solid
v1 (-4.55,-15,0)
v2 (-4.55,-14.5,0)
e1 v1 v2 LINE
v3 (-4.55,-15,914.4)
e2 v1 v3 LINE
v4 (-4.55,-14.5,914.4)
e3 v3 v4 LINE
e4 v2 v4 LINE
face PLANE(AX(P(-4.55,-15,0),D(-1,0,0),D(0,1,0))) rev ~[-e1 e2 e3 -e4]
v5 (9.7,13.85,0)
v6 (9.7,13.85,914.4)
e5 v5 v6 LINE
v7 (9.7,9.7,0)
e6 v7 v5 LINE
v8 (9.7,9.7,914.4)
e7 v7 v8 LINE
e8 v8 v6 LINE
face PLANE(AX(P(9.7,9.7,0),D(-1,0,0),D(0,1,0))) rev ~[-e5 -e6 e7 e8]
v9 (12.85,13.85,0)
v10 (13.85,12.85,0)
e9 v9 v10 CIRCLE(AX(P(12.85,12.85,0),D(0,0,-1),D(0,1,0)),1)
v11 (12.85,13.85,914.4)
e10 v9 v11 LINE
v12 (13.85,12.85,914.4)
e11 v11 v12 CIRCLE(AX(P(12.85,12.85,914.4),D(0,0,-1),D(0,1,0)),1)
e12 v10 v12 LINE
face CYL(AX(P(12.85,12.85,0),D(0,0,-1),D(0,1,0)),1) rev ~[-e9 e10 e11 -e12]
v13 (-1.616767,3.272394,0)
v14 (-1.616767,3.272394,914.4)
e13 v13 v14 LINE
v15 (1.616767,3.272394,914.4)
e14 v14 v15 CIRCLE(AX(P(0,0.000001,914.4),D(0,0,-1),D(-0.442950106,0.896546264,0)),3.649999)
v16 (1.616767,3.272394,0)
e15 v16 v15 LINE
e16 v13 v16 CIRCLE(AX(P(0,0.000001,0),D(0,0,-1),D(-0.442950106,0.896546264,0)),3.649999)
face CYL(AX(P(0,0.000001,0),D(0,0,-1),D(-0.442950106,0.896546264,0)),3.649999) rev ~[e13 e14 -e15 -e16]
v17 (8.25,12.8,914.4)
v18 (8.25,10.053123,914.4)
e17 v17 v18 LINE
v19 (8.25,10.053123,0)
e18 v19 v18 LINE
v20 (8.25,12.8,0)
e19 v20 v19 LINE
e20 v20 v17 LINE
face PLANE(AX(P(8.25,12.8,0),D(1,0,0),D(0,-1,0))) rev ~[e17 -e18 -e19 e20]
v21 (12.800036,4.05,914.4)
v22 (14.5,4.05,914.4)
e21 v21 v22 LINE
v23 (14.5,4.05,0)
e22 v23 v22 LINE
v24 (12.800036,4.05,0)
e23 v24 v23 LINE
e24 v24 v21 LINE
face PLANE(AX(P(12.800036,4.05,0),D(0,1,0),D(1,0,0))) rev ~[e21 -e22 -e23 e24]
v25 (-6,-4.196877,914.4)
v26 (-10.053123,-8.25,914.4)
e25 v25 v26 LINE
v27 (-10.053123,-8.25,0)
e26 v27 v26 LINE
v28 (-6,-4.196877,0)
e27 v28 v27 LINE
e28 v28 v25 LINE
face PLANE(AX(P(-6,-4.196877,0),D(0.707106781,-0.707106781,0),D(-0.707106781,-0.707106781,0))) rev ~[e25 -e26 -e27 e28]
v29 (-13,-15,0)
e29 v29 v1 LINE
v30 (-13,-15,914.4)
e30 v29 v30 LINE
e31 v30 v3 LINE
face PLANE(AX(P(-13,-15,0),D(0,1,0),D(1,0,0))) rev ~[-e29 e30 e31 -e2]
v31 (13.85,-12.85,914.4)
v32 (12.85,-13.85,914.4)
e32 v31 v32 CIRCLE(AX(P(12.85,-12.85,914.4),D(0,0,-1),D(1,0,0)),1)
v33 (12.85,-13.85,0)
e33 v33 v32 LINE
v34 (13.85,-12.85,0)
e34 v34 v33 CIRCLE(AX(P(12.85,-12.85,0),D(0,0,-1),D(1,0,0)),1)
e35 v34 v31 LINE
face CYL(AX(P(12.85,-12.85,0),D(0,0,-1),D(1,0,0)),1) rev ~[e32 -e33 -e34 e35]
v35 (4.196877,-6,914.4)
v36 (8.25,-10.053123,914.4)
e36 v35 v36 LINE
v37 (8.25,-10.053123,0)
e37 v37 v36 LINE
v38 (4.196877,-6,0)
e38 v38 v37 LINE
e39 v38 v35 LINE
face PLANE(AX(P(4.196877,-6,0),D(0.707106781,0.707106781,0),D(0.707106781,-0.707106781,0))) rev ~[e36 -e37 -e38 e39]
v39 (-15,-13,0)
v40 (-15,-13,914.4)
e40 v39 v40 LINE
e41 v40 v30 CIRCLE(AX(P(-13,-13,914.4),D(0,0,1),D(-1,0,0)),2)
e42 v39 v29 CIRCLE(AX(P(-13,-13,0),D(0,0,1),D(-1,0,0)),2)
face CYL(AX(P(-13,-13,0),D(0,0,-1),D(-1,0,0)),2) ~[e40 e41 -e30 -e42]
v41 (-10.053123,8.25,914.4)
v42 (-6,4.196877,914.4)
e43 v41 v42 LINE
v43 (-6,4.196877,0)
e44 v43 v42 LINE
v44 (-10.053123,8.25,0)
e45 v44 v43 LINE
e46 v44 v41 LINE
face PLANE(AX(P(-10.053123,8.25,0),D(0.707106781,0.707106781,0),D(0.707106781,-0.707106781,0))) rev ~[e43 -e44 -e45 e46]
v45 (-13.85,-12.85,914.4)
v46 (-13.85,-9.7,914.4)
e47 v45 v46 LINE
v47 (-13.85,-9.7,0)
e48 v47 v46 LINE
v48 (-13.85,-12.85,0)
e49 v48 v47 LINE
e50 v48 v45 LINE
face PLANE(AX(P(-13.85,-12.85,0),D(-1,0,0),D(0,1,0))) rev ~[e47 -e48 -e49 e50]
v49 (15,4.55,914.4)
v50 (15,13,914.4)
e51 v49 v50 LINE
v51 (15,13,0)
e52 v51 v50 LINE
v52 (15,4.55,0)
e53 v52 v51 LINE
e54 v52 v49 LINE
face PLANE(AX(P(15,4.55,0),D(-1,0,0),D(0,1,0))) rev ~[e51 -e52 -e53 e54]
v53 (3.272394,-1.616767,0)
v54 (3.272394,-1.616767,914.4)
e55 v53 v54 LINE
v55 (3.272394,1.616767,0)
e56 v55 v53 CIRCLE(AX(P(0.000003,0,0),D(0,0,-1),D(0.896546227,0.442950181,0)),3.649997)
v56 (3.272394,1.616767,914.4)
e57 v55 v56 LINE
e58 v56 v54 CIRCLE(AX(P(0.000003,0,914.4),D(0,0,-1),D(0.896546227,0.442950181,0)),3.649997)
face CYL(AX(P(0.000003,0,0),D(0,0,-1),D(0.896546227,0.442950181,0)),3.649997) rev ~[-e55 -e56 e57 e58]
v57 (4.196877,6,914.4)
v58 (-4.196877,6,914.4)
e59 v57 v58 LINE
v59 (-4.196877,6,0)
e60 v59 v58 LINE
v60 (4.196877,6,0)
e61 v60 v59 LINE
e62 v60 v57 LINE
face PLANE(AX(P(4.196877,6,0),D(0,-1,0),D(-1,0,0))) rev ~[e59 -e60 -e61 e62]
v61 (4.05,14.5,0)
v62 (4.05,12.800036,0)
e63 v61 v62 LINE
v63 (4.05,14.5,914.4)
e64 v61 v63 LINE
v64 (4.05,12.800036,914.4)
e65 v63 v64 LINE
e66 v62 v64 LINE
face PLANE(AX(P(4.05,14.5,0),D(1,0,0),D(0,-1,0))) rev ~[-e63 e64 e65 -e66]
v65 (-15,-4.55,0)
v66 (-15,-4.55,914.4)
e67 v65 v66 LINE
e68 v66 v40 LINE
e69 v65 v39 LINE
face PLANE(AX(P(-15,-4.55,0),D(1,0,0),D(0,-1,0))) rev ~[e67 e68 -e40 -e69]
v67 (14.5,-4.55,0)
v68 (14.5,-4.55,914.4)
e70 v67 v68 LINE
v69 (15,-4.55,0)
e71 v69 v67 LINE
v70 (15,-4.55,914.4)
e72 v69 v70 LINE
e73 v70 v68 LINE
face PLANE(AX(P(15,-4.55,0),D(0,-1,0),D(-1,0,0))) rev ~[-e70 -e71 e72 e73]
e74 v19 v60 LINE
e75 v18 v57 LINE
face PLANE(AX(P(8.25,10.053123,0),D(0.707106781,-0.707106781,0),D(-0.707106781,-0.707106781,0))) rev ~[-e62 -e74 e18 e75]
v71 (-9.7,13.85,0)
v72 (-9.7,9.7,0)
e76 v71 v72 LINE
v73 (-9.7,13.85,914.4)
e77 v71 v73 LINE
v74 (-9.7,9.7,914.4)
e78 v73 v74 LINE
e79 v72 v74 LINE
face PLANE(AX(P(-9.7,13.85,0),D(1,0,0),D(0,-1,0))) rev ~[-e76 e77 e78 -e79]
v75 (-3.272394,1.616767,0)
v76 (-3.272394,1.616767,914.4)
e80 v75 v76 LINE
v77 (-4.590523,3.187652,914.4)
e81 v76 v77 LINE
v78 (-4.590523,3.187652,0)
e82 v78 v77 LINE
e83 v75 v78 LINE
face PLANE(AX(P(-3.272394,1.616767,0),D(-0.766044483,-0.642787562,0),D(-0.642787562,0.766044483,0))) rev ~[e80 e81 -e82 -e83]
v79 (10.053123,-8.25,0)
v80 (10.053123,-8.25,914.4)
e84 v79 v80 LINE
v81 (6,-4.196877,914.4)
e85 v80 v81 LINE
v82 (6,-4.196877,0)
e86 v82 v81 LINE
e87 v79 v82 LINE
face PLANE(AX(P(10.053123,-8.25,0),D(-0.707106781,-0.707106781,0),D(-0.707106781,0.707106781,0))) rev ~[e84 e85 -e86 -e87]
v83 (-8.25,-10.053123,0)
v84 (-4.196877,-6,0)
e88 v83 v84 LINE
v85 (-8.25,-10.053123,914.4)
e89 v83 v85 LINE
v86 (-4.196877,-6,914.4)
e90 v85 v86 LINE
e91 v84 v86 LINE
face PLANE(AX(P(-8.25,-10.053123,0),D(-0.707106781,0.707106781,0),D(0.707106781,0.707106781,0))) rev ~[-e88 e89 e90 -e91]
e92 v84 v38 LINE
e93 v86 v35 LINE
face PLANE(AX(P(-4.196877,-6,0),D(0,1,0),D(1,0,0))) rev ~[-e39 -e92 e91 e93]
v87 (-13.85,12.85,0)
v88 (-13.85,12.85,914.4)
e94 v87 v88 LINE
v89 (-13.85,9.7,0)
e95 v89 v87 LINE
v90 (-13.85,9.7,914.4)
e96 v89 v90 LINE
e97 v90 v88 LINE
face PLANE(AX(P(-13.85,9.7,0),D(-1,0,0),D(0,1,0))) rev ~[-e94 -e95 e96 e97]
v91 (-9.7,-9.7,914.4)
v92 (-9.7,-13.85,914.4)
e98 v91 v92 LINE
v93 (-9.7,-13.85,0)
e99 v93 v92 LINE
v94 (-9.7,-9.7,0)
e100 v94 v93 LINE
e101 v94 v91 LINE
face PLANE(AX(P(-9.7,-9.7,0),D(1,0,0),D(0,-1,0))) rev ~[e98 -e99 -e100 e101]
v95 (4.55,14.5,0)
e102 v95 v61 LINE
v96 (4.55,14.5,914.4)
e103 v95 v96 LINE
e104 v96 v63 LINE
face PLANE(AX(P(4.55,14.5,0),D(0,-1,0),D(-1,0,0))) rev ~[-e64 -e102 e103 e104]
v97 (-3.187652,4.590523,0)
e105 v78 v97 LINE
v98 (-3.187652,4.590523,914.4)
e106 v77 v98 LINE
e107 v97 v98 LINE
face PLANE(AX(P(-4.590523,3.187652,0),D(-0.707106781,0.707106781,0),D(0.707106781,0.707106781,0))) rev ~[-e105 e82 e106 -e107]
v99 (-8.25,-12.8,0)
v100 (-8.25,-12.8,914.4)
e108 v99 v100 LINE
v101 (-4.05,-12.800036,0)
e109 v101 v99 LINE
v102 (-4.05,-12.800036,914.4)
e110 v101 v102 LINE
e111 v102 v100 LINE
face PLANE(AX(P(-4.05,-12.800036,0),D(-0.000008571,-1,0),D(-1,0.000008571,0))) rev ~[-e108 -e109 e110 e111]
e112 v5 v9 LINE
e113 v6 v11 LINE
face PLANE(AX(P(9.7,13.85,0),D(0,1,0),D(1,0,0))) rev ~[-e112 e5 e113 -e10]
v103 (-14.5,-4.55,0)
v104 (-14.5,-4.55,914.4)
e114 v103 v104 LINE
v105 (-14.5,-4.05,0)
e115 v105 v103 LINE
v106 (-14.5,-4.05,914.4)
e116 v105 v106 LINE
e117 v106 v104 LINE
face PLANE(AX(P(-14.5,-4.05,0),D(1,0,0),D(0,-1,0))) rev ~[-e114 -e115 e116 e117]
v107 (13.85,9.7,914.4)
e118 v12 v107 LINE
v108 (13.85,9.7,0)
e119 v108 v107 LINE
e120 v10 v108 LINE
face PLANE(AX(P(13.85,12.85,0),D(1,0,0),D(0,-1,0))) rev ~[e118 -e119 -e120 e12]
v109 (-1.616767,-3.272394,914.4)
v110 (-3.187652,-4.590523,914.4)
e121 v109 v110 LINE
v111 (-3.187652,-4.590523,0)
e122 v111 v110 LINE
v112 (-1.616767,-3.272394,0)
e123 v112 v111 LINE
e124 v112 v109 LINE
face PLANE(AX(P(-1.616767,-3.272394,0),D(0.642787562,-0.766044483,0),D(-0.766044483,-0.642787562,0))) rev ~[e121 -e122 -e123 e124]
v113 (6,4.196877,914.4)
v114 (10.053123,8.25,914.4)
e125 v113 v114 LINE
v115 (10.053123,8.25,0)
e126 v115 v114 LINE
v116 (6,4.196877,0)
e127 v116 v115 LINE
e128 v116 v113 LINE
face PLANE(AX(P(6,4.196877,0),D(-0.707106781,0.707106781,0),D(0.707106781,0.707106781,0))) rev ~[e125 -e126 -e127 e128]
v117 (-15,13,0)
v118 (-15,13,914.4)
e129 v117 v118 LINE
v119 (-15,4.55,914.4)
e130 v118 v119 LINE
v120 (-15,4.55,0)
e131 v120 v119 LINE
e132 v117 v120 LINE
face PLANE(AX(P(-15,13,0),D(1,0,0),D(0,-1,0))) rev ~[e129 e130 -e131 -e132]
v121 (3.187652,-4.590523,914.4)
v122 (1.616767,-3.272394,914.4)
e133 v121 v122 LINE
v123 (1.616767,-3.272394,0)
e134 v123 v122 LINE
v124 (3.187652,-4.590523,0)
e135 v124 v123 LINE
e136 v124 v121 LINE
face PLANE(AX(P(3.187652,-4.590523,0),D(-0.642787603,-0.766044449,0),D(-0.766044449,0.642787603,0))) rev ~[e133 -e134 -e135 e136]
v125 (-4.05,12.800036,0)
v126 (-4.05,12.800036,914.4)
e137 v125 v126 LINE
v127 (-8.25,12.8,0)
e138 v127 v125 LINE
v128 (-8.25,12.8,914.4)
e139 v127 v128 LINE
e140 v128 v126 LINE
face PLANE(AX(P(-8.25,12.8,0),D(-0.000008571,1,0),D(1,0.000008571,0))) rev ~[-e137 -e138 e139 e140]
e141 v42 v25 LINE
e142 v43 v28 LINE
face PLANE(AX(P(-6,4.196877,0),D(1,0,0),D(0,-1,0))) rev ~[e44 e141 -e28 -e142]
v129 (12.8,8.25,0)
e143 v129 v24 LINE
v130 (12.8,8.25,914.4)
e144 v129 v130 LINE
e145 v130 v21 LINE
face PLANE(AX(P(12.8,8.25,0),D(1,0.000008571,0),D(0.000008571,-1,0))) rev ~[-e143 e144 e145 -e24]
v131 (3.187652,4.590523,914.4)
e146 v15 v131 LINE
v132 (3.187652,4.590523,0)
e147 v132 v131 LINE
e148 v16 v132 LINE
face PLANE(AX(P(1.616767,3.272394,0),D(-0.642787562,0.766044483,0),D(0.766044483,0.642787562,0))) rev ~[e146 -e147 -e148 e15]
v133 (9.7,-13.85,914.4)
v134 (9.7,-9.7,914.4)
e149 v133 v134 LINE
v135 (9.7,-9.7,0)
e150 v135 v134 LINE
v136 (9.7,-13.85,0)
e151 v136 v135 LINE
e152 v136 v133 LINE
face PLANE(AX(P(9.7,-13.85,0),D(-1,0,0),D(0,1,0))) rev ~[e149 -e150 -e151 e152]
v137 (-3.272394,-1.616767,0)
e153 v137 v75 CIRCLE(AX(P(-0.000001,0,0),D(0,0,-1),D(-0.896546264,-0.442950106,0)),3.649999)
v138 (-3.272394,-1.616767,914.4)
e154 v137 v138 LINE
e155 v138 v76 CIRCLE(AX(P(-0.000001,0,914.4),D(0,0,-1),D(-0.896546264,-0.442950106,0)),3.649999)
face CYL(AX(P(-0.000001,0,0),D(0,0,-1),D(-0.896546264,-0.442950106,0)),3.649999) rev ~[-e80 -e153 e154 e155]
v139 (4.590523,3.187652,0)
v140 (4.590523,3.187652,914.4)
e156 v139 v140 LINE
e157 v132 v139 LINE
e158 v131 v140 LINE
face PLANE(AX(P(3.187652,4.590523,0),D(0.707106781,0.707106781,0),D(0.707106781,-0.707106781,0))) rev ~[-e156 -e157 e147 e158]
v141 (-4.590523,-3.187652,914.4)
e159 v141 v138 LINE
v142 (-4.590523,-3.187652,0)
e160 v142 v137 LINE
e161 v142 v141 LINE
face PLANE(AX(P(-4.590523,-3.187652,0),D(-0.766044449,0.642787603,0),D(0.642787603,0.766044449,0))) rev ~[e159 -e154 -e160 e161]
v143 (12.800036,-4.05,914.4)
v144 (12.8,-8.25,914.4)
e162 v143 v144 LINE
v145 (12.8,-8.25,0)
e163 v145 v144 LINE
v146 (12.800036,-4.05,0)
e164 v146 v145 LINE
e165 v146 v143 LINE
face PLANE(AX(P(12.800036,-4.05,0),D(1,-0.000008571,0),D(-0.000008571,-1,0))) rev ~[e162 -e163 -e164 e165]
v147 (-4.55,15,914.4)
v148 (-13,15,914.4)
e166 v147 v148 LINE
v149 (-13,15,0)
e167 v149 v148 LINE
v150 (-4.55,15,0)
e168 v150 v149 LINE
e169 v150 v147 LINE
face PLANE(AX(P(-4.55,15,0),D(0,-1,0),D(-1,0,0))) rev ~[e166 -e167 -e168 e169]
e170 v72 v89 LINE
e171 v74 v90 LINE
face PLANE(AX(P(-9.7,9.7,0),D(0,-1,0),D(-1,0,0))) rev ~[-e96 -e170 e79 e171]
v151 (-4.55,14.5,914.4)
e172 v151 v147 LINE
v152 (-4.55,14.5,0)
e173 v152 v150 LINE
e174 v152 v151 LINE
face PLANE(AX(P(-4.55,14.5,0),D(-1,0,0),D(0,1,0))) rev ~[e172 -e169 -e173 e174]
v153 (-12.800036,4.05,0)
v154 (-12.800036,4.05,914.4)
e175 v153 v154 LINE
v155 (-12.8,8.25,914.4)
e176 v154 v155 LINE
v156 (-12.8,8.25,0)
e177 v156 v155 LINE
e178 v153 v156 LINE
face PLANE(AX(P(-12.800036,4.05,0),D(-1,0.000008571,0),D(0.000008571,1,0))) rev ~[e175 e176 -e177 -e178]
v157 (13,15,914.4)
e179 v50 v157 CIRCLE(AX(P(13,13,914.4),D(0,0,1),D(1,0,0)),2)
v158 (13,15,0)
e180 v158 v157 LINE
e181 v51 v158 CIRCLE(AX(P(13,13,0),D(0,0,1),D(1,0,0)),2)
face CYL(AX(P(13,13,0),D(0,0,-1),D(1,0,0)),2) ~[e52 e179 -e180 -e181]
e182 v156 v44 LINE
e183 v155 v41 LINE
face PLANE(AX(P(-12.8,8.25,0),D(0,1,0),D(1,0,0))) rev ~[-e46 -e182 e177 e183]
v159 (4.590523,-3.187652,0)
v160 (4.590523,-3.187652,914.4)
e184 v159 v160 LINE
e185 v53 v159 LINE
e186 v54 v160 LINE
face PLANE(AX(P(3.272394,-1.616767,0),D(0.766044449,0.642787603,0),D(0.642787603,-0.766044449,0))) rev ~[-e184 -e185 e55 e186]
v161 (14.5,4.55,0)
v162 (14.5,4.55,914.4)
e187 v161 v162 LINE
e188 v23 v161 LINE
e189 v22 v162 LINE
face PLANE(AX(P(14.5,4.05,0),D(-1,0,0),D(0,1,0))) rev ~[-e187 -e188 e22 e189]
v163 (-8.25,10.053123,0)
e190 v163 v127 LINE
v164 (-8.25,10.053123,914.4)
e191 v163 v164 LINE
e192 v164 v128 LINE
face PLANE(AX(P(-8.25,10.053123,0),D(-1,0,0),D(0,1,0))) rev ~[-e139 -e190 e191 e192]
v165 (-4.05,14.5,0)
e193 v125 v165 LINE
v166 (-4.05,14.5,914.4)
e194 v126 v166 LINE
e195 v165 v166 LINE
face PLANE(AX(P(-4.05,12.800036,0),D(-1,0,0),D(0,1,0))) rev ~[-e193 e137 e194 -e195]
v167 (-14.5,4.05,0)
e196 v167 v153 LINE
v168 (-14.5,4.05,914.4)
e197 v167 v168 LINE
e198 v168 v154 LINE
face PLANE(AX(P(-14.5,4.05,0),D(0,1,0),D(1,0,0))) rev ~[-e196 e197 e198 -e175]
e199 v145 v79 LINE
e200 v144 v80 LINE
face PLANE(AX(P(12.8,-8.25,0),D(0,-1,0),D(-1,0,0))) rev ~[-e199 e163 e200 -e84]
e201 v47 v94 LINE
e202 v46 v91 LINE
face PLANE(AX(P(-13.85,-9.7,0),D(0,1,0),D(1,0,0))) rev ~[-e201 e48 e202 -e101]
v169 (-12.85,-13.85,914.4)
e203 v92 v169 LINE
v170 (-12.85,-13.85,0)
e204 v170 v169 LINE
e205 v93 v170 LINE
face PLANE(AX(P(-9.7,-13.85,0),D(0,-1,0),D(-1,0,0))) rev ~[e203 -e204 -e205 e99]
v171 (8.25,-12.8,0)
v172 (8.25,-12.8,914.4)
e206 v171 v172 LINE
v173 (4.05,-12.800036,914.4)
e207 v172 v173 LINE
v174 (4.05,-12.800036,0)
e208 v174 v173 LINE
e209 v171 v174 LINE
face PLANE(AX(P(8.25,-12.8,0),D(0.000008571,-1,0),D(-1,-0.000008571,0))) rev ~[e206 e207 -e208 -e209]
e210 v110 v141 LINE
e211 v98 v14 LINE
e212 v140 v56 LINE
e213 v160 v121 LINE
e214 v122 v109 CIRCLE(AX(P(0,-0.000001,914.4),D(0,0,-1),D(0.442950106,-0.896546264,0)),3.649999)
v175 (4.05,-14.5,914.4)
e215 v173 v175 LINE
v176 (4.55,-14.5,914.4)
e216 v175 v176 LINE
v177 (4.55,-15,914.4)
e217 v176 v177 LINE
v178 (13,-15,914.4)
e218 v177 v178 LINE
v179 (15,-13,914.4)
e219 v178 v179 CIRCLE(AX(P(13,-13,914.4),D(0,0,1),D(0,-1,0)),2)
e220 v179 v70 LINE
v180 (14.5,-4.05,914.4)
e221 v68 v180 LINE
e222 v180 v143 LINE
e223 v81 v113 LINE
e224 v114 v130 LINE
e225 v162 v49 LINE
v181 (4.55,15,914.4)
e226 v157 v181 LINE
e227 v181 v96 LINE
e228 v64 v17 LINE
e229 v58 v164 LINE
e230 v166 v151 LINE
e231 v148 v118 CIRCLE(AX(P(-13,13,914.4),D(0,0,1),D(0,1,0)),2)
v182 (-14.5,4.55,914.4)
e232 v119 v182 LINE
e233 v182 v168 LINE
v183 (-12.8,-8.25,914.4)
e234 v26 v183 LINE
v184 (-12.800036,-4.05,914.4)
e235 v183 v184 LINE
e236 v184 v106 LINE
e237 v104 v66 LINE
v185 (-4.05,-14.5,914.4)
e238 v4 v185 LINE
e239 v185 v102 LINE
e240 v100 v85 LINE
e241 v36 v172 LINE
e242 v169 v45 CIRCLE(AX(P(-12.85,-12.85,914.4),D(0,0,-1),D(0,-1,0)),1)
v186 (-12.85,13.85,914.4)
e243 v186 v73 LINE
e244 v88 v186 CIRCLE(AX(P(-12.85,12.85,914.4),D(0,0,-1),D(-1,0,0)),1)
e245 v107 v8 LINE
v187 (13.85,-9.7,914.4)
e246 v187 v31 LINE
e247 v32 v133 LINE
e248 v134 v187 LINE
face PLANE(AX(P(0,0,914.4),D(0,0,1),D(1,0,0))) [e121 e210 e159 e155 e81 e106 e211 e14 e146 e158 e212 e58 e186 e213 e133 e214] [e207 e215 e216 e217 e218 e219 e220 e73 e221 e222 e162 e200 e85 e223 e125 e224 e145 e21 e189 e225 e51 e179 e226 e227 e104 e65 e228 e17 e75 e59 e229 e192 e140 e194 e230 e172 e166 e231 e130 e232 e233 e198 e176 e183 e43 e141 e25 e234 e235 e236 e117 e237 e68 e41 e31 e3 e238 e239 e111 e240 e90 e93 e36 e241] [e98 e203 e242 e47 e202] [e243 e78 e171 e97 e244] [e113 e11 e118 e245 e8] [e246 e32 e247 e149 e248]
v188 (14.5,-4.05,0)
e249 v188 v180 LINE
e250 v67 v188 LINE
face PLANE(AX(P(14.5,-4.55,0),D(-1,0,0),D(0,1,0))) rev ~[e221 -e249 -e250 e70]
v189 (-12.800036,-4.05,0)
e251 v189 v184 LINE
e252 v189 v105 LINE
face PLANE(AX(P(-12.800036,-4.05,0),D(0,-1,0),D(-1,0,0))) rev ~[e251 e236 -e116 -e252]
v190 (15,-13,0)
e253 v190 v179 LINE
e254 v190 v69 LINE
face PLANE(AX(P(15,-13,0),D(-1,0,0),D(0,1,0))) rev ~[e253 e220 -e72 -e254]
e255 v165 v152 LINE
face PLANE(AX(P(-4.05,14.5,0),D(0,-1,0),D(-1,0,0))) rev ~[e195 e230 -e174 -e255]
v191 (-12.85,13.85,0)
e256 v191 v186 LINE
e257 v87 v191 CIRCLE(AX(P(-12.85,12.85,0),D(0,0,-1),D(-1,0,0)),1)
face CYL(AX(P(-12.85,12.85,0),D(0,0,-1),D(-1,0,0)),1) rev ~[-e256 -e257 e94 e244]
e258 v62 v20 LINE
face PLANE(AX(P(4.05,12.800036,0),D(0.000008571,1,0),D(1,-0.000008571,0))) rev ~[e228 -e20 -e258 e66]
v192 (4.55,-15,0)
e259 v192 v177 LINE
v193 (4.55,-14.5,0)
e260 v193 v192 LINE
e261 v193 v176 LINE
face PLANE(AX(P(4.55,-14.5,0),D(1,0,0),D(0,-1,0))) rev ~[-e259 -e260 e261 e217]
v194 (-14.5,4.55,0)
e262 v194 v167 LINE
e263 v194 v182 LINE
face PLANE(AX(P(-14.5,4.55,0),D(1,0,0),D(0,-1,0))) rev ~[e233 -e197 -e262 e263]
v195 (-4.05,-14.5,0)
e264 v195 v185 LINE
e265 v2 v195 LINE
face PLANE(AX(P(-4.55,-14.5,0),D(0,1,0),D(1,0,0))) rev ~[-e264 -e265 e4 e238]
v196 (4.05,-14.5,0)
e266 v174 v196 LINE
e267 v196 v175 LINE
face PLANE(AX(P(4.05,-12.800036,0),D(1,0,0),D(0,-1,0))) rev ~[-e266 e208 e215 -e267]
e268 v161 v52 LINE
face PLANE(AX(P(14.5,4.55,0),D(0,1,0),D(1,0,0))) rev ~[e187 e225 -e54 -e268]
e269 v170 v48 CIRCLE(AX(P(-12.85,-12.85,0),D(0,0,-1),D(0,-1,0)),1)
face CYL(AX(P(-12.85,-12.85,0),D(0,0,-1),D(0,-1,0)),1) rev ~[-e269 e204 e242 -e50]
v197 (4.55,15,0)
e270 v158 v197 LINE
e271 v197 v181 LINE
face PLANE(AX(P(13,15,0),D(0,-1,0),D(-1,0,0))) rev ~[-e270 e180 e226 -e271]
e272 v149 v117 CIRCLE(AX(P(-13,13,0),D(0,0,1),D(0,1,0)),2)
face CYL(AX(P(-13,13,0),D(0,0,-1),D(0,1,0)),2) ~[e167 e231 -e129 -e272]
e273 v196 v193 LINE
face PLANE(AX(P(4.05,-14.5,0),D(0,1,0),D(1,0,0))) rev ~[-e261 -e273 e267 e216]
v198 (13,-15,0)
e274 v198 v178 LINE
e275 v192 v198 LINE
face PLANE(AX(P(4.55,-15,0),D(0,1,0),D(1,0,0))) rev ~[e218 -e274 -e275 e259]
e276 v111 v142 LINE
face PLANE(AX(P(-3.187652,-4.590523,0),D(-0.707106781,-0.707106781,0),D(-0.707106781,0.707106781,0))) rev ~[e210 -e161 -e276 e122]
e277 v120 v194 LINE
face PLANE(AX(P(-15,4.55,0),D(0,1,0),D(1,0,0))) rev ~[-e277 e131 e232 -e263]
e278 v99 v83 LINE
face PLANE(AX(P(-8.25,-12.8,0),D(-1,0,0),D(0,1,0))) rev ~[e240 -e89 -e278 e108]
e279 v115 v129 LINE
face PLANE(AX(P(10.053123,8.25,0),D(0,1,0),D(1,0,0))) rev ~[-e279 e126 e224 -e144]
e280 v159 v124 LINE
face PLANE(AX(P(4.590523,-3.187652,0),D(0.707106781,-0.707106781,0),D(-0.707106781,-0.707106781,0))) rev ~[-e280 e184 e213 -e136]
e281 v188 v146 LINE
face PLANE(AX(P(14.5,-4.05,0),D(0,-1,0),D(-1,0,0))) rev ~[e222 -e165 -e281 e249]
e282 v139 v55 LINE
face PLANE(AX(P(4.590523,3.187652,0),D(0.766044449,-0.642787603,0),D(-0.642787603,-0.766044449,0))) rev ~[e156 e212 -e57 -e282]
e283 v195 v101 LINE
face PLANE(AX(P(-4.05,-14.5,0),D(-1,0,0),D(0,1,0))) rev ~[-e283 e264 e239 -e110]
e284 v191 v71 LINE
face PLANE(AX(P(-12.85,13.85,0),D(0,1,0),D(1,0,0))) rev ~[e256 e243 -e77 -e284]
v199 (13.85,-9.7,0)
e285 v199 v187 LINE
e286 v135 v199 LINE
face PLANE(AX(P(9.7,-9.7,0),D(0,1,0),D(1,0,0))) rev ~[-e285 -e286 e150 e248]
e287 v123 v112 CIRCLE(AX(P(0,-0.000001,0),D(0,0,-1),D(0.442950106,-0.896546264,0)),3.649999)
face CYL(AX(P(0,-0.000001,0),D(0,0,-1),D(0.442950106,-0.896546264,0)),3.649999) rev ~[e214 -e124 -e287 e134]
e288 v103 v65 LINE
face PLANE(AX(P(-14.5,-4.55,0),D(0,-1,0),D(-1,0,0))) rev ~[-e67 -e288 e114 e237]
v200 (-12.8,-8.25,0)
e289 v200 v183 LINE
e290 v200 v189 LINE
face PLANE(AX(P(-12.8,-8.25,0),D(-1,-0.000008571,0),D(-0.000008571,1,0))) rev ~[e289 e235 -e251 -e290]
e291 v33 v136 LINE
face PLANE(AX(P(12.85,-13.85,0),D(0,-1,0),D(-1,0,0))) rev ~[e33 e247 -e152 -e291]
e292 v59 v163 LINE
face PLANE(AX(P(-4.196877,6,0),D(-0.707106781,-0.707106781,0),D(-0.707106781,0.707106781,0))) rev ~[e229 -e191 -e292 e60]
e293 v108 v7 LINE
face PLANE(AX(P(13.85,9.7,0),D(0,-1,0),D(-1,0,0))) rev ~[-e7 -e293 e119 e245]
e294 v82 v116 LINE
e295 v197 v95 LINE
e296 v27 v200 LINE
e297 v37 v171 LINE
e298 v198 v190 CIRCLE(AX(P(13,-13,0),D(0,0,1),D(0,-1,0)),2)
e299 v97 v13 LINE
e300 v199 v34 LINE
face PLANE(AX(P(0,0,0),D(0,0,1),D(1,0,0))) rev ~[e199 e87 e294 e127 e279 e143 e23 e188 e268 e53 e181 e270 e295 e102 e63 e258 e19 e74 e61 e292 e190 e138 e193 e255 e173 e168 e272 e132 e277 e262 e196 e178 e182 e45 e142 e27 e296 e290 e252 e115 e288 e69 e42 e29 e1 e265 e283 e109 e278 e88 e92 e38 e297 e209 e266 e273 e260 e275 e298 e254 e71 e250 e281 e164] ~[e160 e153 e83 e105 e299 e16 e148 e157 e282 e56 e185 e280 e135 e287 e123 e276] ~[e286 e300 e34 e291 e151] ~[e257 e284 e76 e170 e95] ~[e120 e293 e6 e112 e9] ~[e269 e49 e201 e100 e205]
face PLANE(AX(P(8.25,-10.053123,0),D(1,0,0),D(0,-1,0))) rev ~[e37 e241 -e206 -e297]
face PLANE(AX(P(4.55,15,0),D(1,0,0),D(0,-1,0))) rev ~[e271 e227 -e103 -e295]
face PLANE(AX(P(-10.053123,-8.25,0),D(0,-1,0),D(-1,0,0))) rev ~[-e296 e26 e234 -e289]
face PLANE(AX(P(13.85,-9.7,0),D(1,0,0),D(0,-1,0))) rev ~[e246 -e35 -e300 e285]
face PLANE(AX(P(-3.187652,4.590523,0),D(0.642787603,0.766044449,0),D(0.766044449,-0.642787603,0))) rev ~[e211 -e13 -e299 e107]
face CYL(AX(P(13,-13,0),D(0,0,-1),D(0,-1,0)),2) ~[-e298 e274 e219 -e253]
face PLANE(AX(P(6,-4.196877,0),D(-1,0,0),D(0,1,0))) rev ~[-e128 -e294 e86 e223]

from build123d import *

# Parameters (mm, degrees)
F1_DEPTH = 914.4


# Not quite as in the source:
# - ends of sketch curves that miss each other by under 0.0002 mm in the source are joined


with BuildPart() as f1:
    # F0 (on Top) → F1 (new body)
    with BuildSketch(Plane.XY):
        with BuildLine():
            Line((-10.053123, -8.25), (-12.8, -8.25))
            Line((-12.8, -8.25), (-12.800036, -4.05))
            Line((-12.800036, -4.05), (-14.5, -4.05))
            Line((-14.5, -4.05), (-14.5, -4.55))
            Line((-14.5, -4.55), (-15, -4.55))
            Line((-15, -4.55), (-15, -13))
            ThreePointArc((-15, -13), (-14.4142135624, -14.4142135624), (-13, -15))
            Line((-13, -15), (-4.55, -15))
            Line((-4.55, -15), (-4.55, -14.5))
            Line((-4.55, -14.5), (-4.05, -14.5))
            Line((-4.05, -14.5), (-4.05, -12.800036))
            Line((-4.05, -12.800036), (-8.25, -12.8))
            Line((-8.25, -12.8), (-8.25, -10.053123))
            Line((-8.25, -10.053123), (-4.196877, -6))
            Line((-4.196877, -6), (4.196877, -6))
            Line((4.196877, -6), (8.25, -10.053123))
            Line((8.25, -10.053123), (8.25, -12.8))
            Line((8.25, -12.8), (4.05, -12.800036))
            Line((4.05, -12.800036), (4.05, -14.5))
            Line((4.05, -14.5), (4.55, -14.5))
            Line((4.55, -14.5), (4.55, -15))
            Line((4.55, -15), (13, -15))
            ThreePointArc((13, -15), (14.4142135624, -14.4142135624), (15, -13))
            Line((15, -13), (15, -4.55))
            Line((15, -4.55), (14.5, -4.55))
            Line((14.5, -4.55), (14.5, -4.05))
            Line((14.5, -4.05), (12.800036, -4.05))
            Line((12.800036, -4.05), (12.8, -8.25))
            Line((12.8, -8.25), (10.053123, -8.25))
            Line((10.053123, -8.25), (6, -4.196877))
            Line((6, -4.196877), (6, 4.196877))
            Line((6, 4.196877), (10.053123, 8.25))
            Line((10.053123, 8.25), (12.8, 8.25))
            Line((12.8, 8.25), (12.800036, 4.05))
            Line((12.800036, 4.05), (14.5, 4.05))
            Line((14.5, 4.05), (14.5, 4.55))
            Line((14.5, 4.55), (15, 4.55))
            Line((15, 4.55), (15, 13))
            ThreePointArc((15, 13), (14.4142135624, 14.4142135624), (13, 15))
            Line((13, 15), (4.55, 15))
            Line((4.55, 15), (4.55, 14.5))
            Line((4.55, 14.5), (4.05, 14.5))
            Line((4.05, 14.5), (4.05, 12.800036))
            Line((4.05, 12.800036), (8.25, 12.8))
            Line((8.25, 12.8), (8.25, 10.053123))
            Line((8.25, 10.053123), (4.196877, 6))
            Line((4.196877, 6), (-4.196877, 6))
            Line((-4.196877, 6), (-8.25, 10.053123))
            Line((-8.25, 10.053123), (-8.25, 12.8))
            Line((-8.25, 12.8), (-4.05, 12.800036))
            Line((-4.05, 12.800036), (-4.05, 14.5))
            Line((-4.05, 14.5), (-4.55, 14.5))
            Line((-4.55, 14.5), (-4.55, 15))
            Line((-4.55, 15), (-13, 15))
            ThreePointArc((-13, 15), (-14.4142135624, 14.4142135624), (-15, 13))
            Line((-15, 13), (-15, 4.55))
            Line((-15, 4.55), (-14.5, 4.55))
            Line((-14.5, 4.55), (-14.5, 4.05))
            Line((-14.5, 4.05), (-12.800036, 4.05))
            Line((-12.800036, 4.05), (-12.8, 8.25))
            Line((-12.8, 8.25), (-10.053123, 8.25))
            Line((-10.053123, 8.25), (-6, 4.196877))
            Line((-6, 4.196877), (-6, -4.196877))
            Line((-6, -4.196877), (-10.053123, -8.25))
        make_face()
        with BuildLine():
            Line((-9.7, -13.85), (-12.85, -13.85))
            ThreePointArc((-12.85, -13.85), (-13.5571067812, -13.5571067812), (-13.85, -12.85))
            Line((-13.85, -12.85), (-13.85, -9.7))
            Line((-13.85, -9.7), (-9.7, -9.7))
            Line((-9.7, -9.7), (-9.7, -13.85))
        make_face(mode=Mode.SUBTRACT)
        with BuildLine():
            Line((12.85, -13.85), (9.7, -13.85))
            Line((9.7, -13.85), (9.7, -9.7))
            Line((9.7, -9.7), (13.85, -9.7))
            Line((13.85, -9.7), (13.85, -12.85))
            ThreePointArc((13.85, -12.85), (13.5571067812, -13.5571067812), (12.85, -13.85))
        make_face(mode=Mode.SUBTRACT)
        with BuildLine():
            Line((-9.7, 9.7), (-13.85, 9.7))
            Line((-13.85, 9.7), (-13.85, 12.85))
            ThreePointArc((-13.85, 12.85), (-13.5571067812, 13.5571067812), (-12.85, 13.85))
            Line((-12.85, 13.85), (-9.7, 13.85))
            Line((-9.7, 13.85), (-9.7, 9.7))
        make_face(mode=Mode.SUBTRACT)
        with BuildLine():
            Line((3.272394, -1.616767), (4.590523, -3.187652))
            Line((4.590523, -3.187652), (3.187652, -4.590523))
            Line((3.187652, -4.590523), (1.616767, -3.272394))
            ThreePointArc((1.616767, -3.272394), (0, -3.65), (-1.6167671199, -3.2723942427))
            Line((-1.6167671199, -3.2723942427), (-3.187652, -4.590523))
            Line((-3.187652, -4.590523), (-4.590523, -3.187652))
            Line((-4.590523, -3.187652), (-3.272394, -1.616767))
            ThreePointArc((-3.272394, -1.616767), (-3.65, 0), (-3.2723942427, 1.6167671199))
            Line((-3.2723942427, 1.6167671199), (-4.590523, 3.187652))
            Line((-4.590523, 3.187652), (-3.187652, 4.590523))
            Line((-3.187652, 4.590523), (-1.616767, 3.272394))
            ThreePointArc((-1.616767, 3.272394), (0, 3.65), (1.6167671199, 3.2723942427))
            Line((1.6167671199, 3.2723942427), (3.187652, 4.590523))
            Line((3.187652, 4.590523), (4.590523, 3.187652))
            Line((4.590523, 3.187652), (3.272394, 1.616767))
            ThreePointArc((3.272394, 1.616767), (3.65, 0), (3.272394, -1.616767))
        make_face(mode=Mode.SUBTRACT)
        with BuildLine():
            Line((13.85, 9.7), (9.7, 9.7))
            Line((9.7, 9.7), (9.7, 13.85))
            Line((9.7, 13.85), (12.85, 13.85))
            ThreePointArc((12.85, 13.85), (13.5571067812, 13.5571067812), (13.85, 12.85))
            Line((13.85, 12.85), (13.85, 9.7))
        make_face(mode=Mode.SUBTRACT)
    extrude(amount=F1_DEPTH)


solid = f1.part
